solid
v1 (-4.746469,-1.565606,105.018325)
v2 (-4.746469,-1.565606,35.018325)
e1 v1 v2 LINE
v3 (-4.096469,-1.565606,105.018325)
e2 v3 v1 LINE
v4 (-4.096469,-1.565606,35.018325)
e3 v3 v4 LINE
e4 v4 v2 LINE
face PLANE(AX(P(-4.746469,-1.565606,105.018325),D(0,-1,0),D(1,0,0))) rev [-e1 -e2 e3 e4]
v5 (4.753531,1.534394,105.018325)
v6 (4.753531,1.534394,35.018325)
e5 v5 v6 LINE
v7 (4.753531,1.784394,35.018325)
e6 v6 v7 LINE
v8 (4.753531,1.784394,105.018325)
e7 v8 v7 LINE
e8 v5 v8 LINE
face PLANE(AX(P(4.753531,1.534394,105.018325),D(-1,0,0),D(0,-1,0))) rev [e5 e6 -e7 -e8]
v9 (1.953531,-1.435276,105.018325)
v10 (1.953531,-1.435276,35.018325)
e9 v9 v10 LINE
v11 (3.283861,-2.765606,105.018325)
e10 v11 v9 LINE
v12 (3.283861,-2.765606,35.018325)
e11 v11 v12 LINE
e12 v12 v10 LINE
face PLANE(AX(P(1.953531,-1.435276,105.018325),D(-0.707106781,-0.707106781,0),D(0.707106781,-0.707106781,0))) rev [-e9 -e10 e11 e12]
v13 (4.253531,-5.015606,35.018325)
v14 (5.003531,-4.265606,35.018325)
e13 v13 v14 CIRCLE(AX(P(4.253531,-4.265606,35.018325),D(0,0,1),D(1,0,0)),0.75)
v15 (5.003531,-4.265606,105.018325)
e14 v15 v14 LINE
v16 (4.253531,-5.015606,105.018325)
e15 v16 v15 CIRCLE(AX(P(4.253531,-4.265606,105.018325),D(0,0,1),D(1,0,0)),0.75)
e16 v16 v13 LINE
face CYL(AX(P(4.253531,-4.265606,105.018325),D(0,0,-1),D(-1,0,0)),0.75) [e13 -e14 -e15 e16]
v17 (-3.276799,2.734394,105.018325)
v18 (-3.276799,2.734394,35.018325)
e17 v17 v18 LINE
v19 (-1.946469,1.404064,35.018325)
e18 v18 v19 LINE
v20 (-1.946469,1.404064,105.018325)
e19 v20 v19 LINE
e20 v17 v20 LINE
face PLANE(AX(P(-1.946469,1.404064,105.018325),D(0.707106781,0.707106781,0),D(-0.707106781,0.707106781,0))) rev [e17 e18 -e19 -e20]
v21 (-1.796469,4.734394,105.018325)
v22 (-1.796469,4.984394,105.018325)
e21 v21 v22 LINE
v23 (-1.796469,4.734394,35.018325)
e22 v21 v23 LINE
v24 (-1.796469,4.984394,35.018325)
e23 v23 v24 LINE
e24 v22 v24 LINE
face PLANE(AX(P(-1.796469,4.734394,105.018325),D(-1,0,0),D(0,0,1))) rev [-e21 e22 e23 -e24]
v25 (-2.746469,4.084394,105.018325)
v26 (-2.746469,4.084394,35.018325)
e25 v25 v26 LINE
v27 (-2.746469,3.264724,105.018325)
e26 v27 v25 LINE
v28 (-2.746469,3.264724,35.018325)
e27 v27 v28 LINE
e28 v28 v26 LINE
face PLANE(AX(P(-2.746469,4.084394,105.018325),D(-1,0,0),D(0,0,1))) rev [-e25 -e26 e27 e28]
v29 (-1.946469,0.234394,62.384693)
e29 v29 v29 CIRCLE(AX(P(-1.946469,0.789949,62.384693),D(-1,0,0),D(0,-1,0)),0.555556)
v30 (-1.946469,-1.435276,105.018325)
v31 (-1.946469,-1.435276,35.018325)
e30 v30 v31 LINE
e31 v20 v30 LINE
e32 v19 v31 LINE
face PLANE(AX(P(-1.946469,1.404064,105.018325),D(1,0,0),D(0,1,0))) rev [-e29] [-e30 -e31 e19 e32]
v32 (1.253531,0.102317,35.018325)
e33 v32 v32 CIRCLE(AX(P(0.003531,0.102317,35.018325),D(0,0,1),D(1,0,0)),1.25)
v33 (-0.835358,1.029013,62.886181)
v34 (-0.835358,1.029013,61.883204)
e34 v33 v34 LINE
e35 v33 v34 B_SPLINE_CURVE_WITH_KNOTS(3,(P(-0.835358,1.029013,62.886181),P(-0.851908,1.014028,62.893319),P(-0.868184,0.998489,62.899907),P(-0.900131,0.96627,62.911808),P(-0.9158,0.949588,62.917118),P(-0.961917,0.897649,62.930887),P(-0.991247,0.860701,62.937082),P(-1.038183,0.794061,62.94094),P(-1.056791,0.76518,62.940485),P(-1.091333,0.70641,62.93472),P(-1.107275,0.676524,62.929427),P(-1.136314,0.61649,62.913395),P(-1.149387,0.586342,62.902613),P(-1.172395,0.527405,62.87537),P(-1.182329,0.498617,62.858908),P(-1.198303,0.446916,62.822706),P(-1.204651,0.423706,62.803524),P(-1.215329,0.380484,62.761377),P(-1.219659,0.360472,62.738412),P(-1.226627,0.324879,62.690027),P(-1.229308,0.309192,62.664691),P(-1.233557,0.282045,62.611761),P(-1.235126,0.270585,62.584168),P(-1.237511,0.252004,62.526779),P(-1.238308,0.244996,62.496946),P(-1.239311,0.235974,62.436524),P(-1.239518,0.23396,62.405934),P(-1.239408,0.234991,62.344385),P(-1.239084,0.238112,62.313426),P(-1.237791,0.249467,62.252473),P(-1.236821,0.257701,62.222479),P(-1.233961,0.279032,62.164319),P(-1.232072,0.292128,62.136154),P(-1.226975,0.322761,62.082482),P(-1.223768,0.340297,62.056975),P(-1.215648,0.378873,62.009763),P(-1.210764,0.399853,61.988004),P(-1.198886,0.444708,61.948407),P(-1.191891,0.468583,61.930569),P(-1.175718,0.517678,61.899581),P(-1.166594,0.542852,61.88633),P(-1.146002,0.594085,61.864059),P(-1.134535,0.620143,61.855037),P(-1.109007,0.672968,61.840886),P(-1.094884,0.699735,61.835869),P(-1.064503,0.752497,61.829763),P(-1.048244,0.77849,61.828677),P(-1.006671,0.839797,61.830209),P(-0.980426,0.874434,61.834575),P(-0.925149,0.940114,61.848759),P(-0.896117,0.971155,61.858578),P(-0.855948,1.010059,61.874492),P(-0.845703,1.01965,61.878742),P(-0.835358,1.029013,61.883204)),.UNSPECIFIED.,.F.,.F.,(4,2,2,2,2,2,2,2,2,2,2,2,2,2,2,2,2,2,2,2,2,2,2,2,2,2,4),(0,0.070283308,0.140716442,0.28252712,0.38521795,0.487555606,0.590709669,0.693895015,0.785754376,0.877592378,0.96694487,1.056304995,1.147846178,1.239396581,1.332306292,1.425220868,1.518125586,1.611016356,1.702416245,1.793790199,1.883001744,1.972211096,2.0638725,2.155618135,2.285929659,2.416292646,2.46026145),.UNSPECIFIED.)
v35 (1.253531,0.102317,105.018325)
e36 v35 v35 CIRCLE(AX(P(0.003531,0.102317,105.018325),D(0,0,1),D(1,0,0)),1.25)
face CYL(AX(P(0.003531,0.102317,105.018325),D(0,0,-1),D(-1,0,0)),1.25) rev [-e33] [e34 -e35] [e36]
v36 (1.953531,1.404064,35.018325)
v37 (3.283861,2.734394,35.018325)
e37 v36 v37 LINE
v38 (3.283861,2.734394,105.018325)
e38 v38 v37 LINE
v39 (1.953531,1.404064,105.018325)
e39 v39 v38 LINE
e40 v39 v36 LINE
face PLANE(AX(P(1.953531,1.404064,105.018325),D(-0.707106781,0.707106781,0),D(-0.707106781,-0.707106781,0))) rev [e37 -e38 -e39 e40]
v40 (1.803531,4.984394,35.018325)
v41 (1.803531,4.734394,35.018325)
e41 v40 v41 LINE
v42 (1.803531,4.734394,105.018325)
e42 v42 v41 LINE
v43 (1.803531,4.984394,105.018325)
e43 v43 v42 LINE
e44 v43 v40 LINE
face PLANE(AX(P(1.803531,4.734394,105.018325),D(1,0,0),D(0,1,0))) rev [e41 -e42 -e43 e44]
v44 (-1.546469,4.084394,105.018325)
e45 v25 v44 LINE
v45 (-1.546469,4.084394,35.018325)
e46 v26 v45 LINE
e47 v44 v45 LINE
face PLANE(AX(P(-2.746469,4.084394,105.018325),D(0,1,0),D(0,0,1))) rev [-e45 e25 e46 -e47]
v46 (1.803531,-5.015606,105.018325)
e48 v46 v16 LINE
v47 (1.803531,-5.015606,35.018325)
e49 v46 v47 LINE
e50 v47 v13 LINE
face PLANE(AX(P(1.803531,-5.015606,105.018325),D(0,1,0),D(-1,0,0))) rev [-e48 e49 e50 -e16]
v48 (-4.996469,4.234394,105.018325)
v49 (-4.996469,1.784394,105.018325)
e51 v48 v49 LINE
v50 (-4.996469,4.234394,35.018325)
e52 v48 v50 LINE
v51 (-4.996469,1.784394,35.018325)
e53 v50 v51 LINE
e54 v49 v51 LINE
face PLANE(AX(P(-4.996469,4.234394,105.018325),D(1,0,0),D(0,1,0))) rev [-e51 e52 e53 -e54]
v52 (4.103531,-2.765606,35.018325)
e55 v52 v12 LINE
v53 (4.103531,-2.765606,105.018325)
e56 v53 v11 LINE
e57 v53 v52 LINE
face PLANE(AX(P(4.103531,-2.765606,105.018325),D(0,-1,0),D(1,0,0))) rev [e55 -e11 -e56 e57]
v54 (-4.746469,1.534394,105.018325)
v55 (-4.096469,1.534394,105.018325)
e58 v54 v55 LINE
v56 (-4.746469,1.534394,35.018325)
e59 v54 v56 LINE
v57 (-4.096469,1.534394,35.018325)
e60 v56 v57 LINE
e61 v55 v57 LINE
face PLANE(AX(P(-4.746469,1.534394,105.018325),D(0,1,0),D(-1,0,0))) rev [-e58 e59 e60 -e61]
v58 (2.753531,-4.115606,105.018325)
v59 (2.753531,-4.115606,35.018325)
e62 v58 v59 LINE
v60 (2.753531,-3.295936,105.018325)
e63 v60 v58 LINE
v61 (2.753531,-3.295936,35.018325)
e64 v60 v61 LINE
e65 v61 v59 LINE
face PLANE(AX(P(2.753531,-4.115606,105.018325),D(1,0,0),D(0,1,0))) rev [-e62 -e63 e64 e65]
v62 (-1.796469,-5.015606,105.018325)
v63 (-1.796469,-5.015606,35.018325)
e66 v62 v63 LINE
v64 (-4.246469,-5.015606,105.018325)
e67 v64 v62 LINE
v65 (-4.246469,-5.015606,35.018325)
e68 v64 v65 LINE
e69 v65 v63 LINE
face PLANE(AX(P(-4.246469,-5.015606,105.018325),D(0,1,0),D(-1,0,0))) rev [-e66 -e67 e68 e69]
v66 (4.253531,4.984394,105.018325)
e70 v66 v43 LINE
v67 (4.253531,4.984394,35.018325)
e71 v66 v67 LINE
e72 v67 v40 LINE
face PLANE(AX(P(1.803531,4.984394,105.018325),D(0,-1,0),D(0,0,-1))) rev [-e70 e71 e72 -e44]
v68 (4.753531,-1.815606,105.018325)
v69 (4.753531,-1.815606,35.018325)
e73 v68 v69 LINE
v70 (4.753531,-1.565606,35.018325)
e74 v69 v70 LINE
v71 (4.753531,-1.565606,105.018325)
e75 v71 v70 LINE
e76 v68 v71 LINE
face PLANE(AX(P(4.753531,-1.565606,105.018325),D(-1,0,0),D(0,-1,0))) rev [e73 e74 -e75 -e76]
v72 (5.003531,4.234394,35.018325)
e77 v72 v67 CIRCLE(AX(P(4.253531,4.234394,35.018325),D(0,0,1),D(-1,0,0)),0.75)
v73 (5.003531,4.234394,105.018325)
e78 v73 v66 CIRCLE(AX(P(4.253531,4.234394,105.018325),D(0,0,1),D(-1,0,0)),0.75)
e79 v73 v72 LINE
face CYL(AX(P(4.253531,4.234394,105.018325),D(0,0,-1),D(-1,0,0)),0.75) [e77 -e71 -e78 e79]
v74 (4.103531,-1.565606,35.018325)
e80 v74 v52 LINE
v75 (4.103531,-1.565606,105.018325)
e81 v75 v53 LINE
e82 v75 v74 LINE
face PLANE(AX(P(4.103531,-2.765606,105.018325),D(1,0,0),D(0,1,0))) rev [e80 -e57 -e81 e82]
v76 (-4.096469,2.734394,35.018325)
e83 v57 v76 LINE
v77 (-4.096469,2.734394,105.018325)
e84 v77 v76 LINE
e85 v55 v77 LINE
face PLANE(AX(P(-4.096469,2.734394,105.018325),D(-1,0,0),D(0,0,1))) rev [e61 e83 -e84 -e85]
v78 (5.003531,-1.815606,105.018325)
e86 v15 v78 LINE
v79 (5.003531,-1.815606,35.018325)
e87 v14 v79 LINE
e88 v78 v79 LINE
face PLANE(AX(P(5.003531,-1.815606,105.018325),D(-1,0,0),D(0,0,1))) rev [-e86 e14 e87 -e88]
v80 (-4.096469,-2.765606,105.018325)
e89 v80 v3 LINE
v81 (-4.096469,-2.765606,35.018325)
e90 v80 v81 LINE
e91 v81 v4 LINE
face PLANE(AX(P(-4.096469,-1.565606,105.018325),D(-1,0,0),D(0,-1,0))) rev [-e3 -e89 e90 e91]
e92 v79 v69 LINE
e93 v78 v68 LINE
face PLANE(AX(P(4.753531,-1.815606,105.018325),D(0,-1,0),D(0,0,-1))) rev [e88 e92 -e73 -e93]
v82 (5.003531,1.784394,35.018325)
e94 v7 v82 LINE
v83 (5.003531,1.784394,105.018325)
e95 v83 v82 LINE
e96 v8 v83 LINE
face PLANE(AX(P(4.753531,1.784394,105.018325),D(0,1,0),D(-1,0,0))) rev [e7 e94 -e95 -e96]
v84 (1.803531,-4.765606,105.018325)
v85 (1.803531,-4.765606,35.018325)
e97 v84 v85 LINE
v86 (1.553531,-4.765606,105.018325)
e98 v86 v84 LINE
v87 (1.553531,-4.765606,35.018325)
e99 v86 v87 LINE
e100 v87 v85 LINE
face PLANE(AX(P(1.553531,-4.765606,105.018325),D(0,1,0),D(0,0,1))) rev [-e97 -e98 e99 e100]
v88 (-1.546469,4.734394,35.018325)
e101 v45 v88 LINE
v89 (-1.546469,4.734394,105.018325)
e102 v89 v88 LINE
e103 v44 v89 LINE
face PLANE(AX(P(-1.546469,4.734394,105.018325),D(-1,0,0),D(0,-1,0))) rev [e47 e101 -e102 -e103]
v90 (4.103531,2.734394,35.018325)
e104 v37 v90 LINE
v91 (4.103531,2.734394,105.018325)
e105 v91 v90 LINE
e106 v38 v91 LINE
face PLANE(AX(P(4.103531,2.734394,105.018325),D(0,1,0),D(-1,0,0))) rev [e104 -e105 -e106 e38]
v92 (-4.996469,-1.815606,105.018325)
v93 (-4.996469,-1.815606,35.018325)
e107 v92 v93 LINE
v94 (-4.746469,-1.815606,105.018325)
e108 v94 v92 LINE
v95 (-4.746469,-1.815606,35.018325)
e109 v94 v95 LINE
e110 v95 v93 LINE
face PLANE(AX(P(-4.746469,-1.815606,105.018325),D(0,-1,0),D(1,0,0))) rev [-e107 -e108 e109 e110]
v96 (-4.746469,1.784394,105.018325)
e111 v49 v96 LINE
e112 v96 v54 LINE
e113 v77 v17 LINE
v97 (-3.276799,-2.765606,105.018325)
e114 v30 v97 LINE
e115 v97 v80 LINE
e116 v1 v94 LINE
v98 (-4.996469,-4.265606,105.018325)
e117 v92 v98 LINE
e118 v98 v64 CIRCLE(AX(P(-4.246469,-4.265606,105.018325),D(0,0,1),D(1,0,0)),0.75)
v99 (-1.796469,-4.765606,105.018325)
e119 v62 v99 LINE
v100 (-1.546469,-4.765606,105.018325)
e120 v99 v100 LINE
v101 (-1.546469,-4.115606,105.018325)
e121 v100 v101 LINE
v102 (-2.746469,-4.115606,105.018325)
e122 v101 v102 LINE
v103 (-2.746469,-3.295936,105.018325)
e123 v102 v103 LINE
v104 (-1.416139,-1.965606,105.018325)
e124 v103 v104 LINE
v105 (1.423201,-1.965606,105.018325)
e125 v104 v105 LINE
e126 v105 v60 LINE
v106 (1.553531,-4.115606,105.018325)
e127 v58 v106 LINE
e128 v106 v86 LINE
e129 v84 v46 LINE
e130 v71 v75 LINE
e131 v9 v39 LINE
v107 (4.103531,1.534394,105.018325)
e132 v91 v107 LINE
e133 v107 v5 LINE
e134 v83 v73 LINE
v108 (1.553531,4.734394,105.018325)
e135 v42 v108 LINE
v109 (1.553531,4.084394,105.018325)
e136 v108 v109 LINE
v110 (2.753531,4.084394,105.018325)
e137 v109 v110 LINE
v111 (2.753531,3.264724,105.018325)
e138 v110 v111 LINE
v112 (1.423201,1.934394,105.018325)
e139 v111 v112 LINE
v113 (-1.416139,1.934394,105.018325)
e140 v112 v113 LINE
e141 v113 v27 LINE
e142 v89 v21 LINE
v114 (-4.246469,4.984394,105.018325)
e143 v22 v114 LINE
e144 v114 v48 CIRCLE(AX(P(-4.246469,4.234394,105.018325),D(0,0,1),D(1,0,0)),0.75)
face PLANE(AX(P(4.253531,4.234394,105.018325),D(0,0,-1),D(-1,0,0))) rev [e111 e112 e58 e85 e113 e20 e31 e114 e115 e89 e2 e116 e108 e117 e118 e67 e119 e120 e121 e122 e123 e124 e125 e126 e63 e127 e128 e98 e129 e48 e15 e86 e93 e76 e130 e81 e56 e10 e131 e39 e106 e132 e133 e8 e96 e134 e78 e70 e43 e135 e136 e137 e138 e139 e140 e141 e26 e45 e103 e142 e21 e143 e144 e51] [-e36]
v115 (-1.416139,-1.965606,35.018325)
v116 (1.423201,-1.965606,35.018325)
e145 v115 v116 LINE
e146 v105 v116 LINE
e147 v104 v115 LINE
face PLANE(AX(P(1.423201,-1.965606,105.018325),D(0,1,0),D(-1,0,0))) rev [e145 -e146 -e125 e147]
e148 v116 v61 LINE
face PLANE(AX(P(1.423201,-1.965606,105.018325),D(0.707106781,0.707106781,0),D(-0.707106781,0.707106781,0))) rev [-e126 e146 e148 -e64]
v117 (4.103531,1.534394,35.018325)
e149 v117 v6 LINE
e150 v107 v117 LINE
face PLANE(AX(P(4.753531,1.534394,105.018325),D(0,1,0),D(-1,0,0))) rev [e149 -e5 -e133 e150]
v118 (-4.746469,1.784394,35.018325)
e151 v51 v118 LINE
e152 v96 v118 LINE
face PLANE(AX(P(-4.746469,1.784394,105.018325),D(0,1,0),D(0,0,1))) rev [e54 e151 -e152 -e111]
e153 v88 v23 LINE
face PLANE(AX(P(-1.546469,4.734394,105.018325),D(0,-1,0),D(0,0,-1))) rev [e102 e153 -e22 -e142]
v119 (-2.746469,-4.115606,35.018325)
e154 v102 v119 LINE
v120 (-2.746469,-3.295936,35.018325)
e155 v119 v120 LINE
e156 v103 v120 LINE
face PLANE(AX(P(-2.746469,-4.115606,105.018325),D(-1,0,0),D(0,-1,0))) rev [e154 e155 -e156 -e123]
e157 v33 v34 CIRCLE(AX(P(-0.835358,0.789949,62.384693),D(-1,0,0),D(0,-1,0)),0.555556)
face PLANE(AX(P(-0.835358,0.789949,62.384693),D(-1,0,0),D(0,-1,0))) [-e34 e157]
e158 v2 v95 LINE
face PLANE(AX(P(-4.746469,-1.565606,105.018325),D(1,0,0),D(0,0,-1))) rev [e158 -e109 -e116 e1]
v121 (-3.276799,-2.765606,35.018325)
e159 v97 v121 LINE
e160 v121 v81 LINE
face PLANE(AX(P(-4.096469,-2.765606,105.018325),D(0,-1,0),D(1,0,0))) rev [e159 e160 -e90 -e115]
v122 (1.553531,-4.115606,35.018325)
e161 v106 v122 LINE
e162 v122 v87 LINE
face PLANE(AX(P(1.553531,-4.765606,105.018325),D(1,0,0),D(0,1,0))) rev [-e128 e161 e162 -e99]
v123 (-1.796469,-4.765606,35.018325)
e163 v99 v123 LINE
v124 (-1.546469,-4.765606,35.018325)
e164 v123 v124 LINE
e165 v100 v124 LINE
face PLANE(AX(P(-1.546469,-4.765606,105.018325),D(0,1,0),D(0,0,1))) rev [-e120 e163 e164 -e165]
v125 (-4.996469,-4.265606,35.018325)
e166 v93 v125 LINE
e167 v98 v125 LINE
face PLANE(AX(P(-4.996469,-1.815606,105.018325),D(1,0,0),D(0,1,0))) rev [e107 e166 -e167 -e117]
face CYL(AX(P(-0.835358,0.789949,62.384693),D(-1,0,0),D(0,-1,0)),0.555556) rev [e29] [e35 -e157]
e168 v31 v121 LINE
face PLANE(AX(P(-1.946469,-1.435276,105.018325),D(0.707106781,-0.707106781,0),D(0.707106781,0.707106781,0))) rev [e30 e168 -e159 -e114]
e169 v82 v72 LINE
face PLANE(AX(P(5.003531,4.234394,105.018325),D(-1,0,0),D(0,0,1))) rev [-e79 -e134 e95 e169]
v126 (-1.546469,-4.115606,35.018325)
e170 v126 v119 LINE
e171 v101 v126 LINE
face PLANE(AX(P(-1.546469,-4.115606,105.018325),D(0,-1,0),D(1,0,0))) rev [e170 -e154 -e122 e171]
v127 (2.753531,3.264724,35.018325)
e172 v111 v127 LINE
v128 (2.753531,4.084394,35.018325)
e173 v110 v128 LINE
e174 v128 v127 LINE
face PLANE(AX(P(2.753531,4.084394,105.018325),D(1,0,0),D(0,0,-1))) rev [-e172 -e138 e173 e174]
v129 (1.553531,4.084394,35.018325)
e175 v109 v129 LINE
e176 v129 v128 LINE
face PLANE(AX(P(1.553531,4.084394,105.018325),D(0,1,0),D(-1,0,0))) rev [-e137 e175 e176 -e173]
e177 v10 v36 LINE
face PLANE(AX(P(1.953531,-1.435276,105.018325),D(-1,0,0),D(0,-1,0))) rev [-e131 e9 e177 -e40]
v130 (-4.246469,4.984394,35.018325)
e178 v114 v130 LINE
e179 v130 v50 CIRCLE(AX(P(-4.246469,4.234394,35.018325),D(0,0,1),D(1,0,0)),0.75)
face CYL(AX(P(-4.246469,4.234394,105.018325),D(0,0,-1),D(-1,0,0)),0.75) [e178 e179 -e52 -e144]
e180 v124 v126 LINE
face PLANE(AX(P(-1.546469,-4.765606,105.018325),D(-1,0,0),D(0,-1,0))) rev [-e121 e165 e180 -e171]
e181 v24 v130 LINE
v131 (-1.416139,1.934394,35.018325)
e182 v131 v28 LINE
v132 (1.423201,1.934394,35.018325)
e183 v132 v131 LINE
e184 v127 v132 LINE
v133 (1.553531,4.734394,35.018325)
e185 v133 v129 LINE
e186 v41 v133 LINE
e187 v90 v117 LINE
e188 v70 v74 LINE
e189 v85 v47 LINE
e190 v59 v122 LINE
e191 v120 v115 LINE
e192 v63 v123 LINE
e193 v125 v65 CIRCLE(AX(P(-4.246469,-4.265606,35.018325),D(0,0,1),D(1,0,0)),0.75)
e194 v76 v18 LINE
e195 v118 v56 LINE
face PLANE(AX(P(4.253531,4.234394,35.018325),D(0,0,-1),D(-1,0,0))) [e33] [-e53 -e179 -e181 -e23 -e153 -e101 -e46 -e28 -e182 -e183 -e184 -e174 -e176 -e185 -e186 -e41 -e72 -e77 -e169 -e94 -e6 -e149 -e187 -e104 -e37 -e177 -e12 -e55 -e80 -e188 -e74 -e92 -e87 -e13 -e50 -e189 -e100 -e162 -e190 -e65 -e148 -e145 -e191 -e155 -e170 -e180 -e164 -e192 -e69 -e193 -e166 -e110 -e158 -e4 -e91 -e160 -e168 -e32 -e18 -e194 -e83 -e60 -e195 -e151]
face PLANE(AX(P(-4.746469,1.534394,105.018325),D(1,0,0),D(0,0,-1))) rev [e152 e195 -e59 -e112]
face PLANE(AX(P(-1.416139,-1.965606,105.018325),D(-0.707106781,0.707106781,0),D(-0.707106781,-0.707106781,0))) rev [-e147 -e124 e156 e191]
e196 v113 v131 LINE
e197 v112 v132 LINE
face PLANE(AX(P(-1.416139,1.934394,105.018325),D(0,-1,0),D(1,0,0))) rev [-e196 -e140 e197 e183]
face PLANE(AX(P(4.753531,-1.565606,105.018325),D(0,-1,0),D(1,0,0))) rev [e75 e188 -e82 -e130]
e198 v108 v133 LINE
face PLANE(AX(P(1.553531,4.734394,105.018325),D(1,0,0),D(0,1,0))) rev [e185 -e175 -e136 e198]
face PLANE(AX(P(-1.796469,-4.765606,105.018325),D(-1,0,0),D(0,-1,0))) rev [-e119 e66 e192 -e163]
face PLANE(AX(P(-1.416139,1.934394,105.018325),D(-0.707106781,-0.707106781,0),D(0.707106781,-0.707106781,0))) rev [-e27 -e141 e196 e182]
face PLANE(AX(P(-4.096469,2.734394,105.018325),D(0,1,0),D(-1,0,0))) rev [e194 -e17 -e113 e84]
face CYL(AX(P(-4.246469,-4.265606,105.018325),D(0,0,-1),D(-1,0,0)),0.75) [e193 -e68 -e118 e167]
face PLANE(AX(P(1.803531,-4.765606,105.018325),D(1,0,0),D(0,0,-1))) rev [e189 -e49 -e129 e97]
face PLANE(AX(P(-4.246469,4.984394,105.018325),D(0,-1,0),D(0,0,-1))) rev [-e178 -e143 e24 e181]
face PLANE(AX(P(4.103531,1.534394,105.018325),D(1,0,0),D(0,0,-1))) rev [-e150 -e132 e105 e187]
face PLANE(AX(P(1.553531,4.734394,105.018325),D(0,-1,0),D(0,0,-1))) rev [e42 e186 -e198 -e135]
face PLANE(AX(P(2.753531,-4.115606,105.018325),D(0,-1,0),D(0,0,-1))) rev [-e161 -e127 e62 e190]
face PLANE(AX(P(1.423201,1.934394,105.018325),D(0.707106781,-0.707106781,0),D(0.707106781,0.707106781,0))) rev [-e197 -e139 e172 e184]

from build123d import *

# Parameters (mm, degrees)
SKETCH1_R           = 2.5
BOSS_EXTRUDE1_DEPTH = 140
SCALE_2_SCALE       = 3
SCALE_3_SCALE       = 6
SCALE_5_SCALE       = 2
SCALE_6_SCALE       = 0.25
SCALE_7_SCALE       = 0.125
SCALE_8_SCALE       = 0.25
SCALE_9_SCALE       = 4
SCALE_10_SCALE      = 4
OTHER_START         = -17.55
OTHER_1_OUTLINE_R   = 5
OTHER_1_DEPTH       = 10
SCALE_11_SCALE      = 0.111111111


# Read off the part's stored shape, not the designer's step: 孔1
with BuildPart() as part:
    # Sketch1 → Boss-Extrude1 (new body)
    with BuildSketch(Plane.XY):
        with BuildLine():
            Line((2.839339828, 3.9), (5.5, 6.560660172))
            Line((5.5, 6.560660172), (5.5, 8.2))
            Line((5.5, 8.2), (3.1, 8.2))
            Line((3.1, 8.2), (3.1, 9.5))
            Line((3.1, 9.5), (3.6, 9.5))
            Line((3.6, 9.5), (3.6, 10))
            Line((3.6, 10), (8.5, 10))
            ThreePointArc((8.5, 10), (9.560660172, 9.560660172), (10, 8.5))
            Line((10, 8.5), (10, 3.6))
            Line((10, 3.6), (9.5, 3.6))
            Line((9.5, 3.6), (9.5, 3.1))
            Line((9.5, 3.1), (8.2, 3.1))
            Line((8.2, 3.1), (8.2, 5.5))
            Line((8.2, 5.5), (6.560660172, 5.5))
            Line((6.560660172, 5.5), (3.9, 2.839339828))
            Line((3.9, 2.839339828), (3.9, -2.839339828))
            Line((3.9, -2.839339828), (6.560660172, -5.5))
            Line((6.560660172, -5.5), (8.2, -5.5))
            Line((8.2, -5.5), (8.2, -3.1))
            Line((8.2, -3.1), (9.5, -3.1))
            Line((9.5, -3.1), (9.5, -3.6))
            Line((9.5, -3.6), (10, -3.6))
            Line((10, -3.6), (10, -8.5))
            ThreePointArc((10, -8.5), (9.560660172, -9.560660172), (8.5, -10))
            Line((8.5, -10), (3.6, -10))
            Line((3.6, -10), (3.6, -9.5))
            Line((3.6, -9.5), (3.1, -9.5))
            Line((3.1, -9.5), (3.1, -8.2))
            Line((3.1, -8.2), (5.5, -8.2))
            Line((5.5, -8.2), (5.5, -6.560660172))
            Line((5.5, -6.560660172), (2.839339828, -3.9))
            Line((2.839339828, -3.9), (-2.839339828, -3.9))
            Line((-2.839339828, -3.9), (-5.5, -6.560660172))
            Line((-5.5, -6.560660172), (-5.5, -8.2))
            Line((-5.5, -8.2), (-3.1, -8.2))
            Line((-3.1, -8.2), (-3.1, -9.5))
            Line((-3.1, -9.5), (-3.6, -9.5))
            Line((-3.6, -9.5), (-3.6, -10))
            Line((-3.6, -10), (-8.5, -10))
            ThreePointArc((-8.5, -10), (-9.560660172, -9.560660172), (-10, -8.5))
            Line((-10, -8.5), (-10, -3.6))
            Line((-10, -3.6), (-9.5, -3.6))
            Line((-9.5, -3.6), (-9.5, -3.1))
            Line((-9.5, -3.1), (-8.2, -3.1))
            Line((-8.2, -3.1), (-8.2, -5.5))
            Line((-8.2, -5.5), (-6.560660172, -5.5))
            Line((-6.560660172, -5.5), (-3.9, -2.839339828))
            Line((-3.9, -2.839339828), (-3.9, 2.839339828))
            Line((-3.9, 2.839339828), (-6.560660172, 5.5))
            Line((-6.560660172, 5.5), (-8.2, 5.5))
            Line((-8.2, 5.5), (-8.2, 3.1))
            Line((-8.2, 3.1), (-9.5, 3.1))
            Line((-9.5, 3.1), (-9.5, 3.6))
            Line((-9.5, 3.6), (-10, 3.6))
            Line((-10, 3.6), (-10, 8.5))
            ThreePointArc((-10, 8.5), (-9.560660172, 9.560660172), (-8.5, 10))
            Line((-8.5, 10), (-3.6, 10))
            Line((-3.6, 10), (-3.6, 9.5))
            Line((-3.6, 9.5), (-3.1, 9.5))
            Line((-3.1, 9.5), (-3.1, 8.2))
            Line((-3.1, 8.2), (-5.5, 8.2))
            Line((-5.5, 8.2), (-5.5, 6.560660172))
            Line((-5.5, 6.560660172), (-2.839339828, 3.9))
            Line((-2.839339828, 3.9), (2.839339828, 3.9))
        make_face()
        with Locations((0, 0.235847297)):
            Circle(SKETCH1_R, mode=Mode.SUBTRACT)
    extrude(amount=BOSS_EXTRUDE1_DEPTH)


with BuildPart() as part_1:
    # 缩放比例2: scaled about (0, -0.027095247, 70)
    add(part.part.scale(SCALE_2_SCALE).moved(Location((0, 0.054190494, -140))))


with BuildPart() as part_2:
    # 缩放比例3: scaled about (0, -0.027095247, 70)
    add(part_1.part.scale(SCALE_3_SCALE).moved(Location((0, 0.135476235, -350))))


with BuildPart() as part_3:
    # 缩放比例5: scaled about (0, -0.027095249, 70)
    add(part_2.part.scale(SCALE_5_SCALE).moved(Location((0, 0.027095249, -70))))


with BuildPart() as part_4:
    # 缩放比例6: scaled about (0, -0.027095249, 70)
    add(part_3.part.scale(SCALE_6_SCALE).moved(Location((0, -0.020321437, 52.5))))


with BuildPart() as part_5:
    # 缩放比例7: scaled about (0, -0.027095249, 70)
    add(part_4.part.scale(SCALE_7_SCALE).moved(Location((0, -0.023708343, 61.25))))


with BuildPart() as part_6:
    # 缩放比例8: scaled about (0, -0.027095249, 70)
    add(part_5.part.scale(SCALE_8_SCALE).moved(Location((0, -0.020321437, 52.5))))


with BuildPart() as part_7:
    # 缩放比例9: scaled about (0, -0.027095249, 70)
    add(part_6.part.scale(SCALE_9_SCALE).moved(Location((0, 0.081285747, -210))))


with BuildPart() as part_8:
    # 缩放比例10: scaled about (0, -0.027095249, 70)
    add(part_7.part.scale(SCALE_10_SCALE).moved(Location((0, 0.081285747, -210))))

    # 孔1 outline → 孔1 (cut)
    with BuildSketch(Plane.YZ.offset(OTHER_START)):
        with Locations((7.344833538, 1.297306883)):
            Circle(OTHER_1_OUTLINE_R)
    extrude(amount=OTHER_1_DEPTH, mode=Mode.SUBTRACT)


with BuildPart() as part_9:
    # 缩放比例11: scaled about (0.003980467, -0.029415588, 70.020567574)
    add(part_8.part.scale(SCALE_11_SCALE).moved(Location((0.003538193, -0.026147189, 62.24050451))))


solid = part_9.part
